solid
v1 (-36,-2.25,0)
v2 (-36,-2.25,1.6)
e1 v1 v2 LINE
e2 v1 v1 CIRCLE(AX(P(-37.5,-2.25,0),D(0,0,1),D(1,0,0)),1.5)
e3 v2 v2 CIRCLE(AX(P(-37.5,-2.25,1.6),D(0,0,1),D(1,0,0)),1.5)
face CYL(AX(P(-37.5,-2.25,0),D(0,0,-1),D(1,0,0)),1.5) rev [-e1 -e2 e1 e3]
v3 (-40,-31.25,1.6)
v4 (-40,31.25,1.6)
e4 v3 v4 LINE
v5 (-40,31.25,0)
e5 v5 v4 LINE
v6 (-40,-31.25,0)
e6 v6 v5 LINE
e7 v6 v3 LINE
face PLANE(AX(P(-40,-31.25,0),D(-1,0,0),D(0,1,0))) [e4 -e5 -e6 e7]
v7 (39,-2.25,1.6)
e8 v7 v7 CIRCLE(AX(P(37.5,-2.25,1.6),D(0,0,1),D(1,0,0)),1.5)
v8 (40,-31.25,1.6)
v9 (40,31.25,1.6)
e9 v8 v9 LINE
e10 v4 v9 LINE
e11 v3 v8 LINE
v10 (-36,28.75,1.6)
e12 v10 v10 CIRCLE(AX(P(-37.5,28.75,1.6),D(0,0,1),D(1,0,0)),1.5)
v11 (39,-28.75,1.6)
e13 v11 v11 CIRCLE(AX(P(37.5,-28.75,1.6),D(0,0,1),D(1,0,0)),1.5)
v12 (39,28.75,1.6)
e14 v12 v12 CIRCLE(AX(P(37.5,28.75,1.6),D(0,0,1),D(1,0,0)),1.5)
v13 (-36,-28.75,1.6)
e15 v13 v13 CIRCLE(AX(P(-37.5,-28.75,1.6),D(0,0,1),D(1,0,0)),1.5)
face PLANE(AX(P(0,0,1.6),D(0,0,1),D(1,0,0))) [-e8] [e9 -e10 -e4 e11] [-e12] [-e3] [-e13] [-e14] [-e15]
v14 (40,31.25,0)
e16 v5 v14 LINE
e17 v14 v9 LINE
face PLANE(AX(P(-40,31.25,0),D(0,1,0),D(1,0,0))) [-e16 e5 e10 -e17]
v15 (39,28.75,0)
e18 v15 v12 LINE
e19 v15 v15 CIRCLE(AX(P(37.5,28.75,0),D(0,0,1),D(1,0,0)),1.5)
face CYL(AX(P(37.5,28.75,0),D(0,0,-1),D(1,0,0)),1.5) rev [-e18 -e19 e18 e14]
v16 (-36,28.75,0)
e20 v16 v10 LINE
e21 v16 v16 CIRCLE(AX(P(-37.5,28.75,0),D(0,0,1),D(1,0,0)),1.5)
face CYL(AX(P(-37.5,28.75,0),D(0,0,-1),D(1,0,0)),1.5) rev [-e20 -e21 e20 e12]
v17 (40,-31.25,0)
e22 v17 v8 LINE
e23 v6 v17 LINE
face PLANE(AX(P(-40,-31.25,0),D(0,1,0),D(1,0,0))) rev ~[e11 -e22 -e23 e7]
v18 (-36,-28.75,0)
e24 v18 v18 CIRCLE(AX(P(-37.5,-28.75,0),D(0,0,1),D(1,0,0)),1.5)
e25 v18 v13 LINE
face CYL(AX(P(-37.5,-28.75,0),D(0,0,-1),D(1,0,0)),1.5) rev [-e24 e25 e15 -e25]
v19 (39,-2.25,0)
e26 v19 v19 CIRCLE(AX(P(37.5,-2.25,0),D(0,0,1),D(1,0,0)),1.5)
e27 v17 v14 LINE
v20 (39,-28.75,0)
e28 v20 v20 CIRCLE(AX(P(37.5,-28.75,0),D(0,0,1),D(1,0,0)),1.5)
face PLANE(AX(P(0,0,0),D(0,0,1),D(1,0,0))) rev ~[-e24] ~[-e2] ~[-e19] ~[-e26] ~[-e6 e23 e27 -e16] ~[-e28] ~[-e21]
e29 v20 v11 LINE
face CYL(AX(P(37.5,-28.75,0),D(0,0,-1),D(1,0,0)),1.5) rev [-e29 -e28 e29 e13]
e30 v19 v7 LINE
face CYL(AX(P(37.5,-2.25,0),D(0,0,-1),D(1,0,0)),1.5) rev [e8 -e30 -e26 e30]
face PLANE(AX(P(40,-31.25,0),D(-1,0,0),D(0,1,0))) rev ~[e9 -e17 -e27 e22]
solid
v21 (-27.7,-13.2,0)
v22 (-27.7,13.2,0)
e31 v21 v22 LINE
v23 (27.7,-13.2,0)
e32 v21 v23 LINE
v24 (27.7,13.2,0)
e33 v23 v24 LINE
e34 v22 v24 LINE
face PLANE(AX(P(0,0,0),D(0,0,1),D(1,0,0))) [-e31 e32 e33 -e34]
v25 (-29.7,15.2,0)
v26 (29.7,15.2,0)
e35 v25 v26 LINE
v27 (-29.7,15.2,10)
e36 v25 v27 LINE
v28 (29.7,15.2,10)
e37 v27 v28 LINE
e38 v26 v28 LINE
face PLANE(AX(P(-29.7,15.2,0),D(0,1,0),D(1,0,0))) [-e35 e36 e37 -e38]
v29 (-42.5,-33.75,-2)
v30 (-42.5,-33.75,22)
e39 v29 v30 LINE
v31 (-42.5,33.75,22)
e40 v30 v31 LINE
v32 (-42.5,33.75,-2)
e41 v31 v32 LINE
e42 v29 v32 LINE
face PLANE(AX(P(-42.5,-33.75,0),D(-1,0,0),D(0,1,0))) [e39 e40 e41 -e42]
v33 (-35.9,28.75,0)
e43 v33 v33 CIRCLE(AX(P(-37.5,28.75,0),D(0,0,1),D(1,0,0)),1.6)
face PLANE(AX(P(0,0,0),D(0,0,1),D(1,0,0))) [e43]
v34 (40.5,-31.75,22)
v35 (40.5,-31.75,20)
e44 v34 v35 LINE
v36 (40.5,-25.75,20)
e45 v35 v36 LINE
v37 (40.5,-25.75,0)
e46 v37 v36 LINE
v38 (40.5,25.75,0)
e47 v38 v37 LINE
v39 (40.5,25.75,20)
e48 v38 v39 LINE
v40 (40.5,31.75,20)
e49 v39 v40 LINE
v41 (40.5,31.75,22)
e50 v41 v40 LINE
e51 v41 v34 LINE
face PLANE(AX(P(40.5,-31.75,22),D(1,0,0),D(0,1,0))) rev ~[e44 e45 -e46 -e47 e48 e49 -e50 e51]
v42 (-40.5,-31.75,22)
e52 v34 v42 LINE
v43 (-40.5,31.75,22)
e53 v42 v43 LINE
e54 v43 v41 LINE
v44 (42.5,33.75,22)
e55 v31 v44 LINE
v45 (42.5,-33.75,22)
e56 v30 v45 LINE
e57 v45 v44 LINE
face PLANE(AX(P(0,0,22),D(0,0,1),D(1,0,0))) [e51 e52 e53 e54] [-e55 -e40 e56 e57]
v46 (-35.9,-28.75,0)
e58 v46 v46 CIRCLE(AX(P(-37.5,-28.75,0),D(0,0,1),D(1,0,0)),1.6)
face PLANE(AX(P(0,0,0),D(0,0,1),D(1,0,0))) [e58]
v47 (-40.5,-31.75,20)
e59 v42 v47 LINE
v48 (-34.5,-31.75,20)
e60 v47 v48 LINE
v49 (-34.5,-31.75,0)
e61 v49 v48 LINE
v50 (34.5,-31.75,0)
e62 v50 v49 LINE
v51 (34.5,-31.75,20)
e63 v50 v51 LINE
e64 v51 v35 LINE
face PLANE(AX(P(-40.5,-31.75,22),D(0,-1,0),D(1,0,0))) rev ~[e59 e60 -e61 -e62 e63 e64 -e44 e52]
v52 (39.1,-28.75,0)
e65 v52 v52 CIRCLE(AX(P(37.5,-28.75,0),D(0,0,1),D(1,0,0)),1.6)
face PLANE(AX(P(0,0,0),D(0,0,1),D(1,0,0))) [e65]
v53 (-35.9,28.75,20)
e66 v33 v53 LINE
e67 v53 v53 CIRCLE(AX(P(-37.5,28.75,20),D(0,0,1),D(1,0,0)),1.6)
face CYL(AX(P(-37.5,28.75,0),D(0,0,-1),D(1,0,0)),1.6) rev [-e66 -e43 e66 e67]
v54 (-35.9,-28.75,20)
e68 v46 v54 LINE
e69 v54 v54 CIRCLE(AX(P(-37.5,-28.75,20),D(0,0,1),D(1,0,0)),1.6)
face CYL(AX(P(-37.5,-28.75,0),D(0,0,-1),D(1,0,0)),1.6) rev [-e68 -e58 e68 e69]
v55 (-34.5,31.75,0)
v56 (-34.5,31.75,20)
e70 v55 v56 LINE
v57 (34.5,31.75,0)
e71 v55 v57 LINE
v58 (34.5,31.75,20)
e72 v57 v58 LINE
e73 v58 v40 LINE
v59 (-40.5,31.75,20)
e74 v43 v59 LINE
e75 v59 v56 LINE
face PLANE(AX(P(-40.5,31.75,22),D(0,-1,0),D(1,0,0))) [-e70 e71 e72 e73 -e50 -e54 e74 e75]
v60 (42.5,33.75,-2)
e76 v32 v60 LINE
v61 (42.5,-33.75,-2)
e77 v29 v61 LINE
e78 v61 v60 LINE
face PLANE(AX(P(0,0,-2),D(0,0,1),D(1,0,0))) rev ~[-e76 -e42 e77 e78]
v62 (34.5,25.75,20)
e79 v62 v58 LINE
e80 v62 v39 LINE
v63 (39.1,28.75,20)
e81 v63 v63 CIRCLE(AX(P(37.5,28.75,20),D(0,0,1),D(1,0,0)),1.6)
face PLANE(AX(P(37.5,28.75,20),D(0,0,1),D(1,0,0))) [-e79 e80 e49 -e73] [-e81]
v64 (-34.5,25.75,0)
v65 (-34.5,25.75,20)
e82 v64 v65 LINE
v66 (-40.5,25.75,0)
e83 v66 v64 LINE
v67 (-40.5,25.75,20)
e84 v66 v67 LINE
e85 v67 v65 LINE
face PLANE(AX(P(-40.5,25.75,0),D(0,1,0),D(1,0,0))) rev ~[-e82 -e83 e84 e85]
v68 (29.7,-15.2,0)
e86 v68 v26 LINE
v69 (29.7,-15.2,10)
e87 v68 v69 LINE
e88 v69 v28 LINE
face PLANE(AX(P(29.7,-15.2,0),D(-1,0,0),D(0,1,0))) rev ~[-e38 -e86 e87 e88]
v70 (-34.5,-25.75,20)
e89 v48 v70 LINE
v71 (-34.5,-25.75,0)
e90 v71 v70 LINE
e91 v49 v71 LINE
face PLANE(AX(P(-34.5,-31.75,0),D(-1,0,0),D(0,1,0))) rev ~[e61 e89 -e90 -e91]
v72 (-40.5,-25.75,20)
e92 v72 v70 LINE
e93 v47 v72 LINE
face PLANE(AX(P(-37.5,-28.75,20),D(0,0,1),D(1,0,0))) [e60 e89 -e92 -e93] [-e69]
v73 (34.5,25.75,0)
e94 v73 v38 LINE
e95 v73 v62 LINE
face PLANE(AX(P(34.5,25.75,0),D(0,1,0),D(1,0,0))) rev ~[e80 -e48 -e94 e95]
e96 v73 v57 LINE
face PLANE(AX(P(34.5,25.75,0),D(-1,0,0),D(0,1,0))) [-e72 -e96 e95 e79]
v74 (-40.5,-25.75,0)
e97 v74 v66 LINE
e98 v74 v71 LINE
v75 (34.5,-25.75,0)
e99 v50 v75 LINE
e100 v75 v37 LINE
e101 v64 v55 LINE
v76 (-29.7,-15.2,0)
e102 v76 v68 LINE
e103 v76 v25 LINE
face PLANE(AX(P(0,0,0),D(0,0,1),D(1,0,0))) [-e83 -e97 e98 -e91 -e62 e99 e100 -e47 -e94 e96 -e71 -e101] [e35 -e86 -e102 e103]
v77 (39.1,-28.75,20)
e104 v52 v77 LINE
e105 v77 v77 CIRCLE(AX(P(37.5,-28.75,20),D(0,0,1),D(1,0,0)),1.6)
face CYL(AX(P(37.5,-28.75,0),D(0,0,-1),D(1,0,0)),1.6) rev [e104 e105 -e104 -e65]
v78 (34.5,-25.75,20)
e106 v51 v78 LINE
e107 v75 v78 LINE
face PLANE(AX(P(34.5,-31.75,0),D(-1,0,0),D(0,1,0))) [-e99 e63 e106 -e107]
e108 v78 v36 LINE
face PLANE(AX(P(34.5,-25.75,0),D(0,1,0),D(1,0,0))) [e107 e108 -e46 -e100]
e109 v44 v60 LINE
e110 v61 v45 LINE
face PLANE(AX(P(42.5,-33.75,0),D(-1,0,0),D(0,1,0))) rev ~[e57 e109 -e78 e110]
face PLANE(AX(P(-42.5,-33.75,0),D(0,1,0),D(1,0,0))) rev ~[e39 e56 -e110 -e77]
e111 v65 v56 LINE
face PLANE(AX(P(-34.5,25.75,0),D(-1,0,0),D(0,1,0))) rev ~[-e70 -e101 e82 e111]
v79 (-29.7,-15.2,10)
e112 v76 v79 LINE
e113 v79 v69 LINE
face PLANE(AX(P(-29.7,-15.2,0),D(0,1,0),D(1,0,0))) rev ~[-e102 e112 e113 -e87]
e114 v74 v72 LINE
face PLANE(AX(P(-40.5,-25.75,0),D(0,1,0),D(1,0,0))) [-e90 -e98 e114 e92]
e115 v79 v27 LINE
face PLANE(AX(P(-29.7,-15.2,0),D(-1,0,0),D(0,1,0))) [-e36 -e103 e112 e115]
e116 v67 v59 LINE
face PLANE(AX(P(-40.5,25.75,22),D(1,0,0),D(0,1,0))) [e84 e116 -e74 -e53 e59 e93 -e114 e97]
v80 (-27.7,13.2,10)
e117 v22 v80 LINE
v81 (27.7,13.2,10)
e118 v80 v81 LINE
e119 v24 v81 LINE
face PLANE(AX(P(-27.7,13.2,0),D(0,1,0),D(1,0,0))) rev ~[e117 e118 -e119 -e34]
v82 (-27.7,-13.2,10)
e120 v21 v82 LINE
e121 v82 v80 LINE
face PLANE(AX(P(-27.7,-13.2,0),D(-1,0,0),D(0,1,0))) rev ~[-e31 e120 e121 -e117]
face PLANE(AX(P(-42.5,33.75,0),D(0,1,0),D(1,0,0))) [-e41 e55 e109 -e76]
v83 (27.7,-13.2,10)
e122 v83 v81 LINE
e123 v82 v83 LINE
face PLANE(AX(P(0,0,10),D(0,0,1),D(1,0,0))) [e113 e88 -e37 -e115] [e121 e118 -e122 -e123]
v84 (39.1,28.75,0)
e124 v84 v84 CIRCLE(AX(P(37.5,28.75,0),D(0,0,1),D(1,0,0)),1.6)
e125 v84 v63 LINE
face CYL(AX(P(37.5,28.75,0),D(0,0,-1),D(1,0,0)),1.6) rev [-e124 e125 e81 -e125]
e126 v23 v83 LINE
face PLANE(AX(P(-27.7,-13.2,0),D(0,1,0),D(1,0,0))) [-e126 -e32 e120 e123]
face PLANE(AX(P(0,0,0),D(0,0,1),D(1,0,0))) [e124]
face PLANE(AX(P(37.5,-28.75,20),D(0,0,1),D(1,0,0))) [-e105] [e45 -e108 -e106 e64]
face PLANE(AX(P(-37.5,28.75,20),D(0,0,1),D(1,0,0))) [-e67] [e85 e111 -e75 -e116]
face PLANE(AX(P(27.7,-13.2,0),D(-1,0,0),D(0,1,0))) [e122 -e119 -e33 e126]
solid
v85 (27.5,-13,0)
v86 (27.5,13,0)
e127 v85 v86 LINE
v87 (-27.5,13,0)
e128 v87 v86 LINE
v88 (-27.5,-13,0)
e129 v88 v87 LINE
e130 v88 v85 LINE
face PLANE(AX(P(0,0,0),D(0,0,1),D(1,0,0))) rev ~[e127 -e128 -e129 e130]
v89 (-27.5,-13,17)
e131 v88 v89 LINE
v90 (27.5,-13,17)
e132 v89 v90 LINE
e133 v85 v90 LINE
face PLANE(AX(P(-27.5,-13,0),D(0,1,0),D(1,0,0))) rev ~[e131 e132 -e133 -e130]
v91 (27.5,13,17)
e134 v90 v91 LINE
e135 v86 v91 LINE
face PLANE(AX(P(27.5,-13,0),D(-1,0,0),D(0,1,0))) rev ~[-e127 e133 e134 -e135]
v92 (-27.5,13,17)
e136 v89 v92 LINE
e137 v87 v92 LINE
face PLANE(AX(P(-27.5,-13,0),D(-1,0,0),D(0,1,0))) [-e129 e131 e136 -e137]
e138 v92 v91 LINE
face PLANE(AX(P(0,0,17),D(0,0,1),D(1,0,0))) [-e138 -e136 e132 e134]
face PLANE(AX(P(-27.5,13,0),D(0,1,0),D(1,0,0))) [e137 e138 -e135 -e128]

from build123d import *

# Parameters (mm, degrees)
F1_W      = 80
F1_H      = 62.5
F1_R      = 1.5
F2_DEPTH  = 1.6
F3_W      = 85
F3_H      = 67.5
F3_W_2    = 6
F3_H_2    = 6
F3_R      = 1.6
F4_DEPTH  = 2
F5_DEPTH  = 22
F6_W      = 6
F6_H      = 6
F6_R      = 1.6
F7_DEPTH  = 2
F8_W      = 55
F8_H      = 26
F9_DEPTH  = 17
F10_W     = 59.4
F10_H     = 30.4
F10_W_2   = 55.4
F10_H_2   = 26.4
F11_DEPTH = 10


with BuildPart() as f2:
    # F1 (on Top) → F2 (new body)
    with BuildSketch(Plane.XY):
        Rectangle(F1_W, F1_H)
        with Locations((-37.5, -28.75)):
            Circle(F1_R, mode=Mode.SUBTRACT)
        with Locations((-37.5, -2.25)):
            Circle(F1_R, mode=Mode.SUBTRACT)
        with Locations((37.5, -28.75)):
            Circle(F1_R, mode=Mode.SUBTRACT)
        with Locations((37.5, -2.25)):
            Circle(F1_R, mode=Mode.SUBTRACT)
        with Locations((-37.5, 28.75)):
            Circle(F1_R, mode=Mode.SUBTRACT)
        with Locations((37.5, 28.75)):
            Circle(F1_R, mode=Mode.SUBTRACT)
    extrude(amount=F2_DEPTH)


with BuildPart() as f4:
    # F3 (on Top) → F4 (new body)
    with BuildSketch(Plane.XY):
        Rectangle(F3_W, F3_H)
        Polygon((34.5, 31.75), (40.5, 31.75), (40.5, 25.75), (40.5, -25.75), (40.5, -31.75), (34.5, -31.75), (-34.5, -31.75), (-40.5, -31.75), (-40.5, -25.75), (-40.5, 25.75), (-40.5, 31.75), (-34.5, 31.75), align=None, mode=Mode.SUBTRACT)
        with Locations((-37.5, 28.75)):
            Rectangle(F3_W_2, F3_H_2)
        with Locations((-37.5, 28.75)):
            Circle(F3_R, mode=Mode.SUBTRACT)
        with Locations((-37.5, 28.75)):
            Circle(F3_R)
        Polygon((34.5, 25.75), (34.5, 31.75), (-34.5, 31.75), (-34.5, 25.75), (-40.5, 25.75), (-40.5, -25.75), (-34.5, -25.75), (-34.5, -31.75), (34.5, -31.75), (34.5, -25.75), (40.5, -25.75), (40.5, 25.75), align=None)
        with Locations((37.5, 28.75)):
            Rectangle(F3_W_2, F3_H_2)
        with Locations((37.5, 28.75)):
            Circle(F3_R, mode=Mode.SUBTRACT)
        with Locations((37.5, 28.75)):
            Circle(F3_R)
        with Locations((37.5, -28.75)):
            Rectangle(F3_W_2, F3_H_2)
        with Locations((37.5, -28.75)):
            Circle(F3_R, mode=Mode.SUBTRACT)
        with Locations((37.5, -28.75)):
            Circle(F3_R)
        with Locations((-37.5, -28.75)):
            Rectangle(F3_W_2, F3_H_2)
        with Locations((-37.5, -28.75)):
            Circle(F3_R, mode=Mode.SUBTRACT)
        with Locations((-37.5, -28.75)):
            Circle(F3_R)
    extrude(amount=-F4_DEPTH)

    # F3 (on Top) → F5 (join)
    with BuildSketch(Plane.XY):
        Rectangle(F3_W, F3_H)
        Polygon((34.5, 31.75), (40.5, 31.75), (40.5, 25.75), (40.5, -25.75), (40.5, -31.75), (34.5, -31.75), (-34.5, -31.75), (-40.5, -31.75), (-40.5, -25.75), (-40.5, 25.75), (-40.5, 31.75), (-34.5, 31.75), align=None, mode=Mode.SUBTRACT)
        with Locations((-37.5, 28.75)):
            Rectangle(F3_W_2, F3_H_2)
        with Locations((-37.5, 28.75)):
            Circle(F3_R, mode=Mode.SUBTRACT)
        with Locations((37.5, 28.75)):
            Rectangle(F3_W_2, F3_H_2)
        with Locations((37.5, 28.75)):
            Circle(F3_R, mode=Mode.SUBTRACT)
        with Locations((37.5, -28.75)):
            Rectangle(F3_W_2, F3_H_2)
        with Locations((37.5, -28.75)):
            Circle(F3_R, mode=Mode.SUBTRACT)
        with Locations((-37.5, -28.75)):
            Rectangle(F3_W_2, F3_H_2)
        with Locations((-37.5, -28.75)):
            Circle(F3_R, mode=Mode.SUBTRACT)
    extrude(amount=F5_DEPTH)

    # F6 (on face) → F7 (cut)
    with BuildSketch(Plane.XY.offset(22)):
        with Locations((-37.5, 28.75)):
            Rectangle(F6_W, F6_H)
        with Locations((-37.5, 28.75)):
            Circle(F6_R, mode=Mode.SUBTRACT)
        with Locations((-37.5, -28.75)):
            Rectangle(F6_W, F6_H)
        with Locations((-37.5, -28.75)):
            Circle(F6_R, mode=Mode.SUBTRACT)
        with Locations((37.5, 28.75)):
            Rectangle(F6_W, F6_H)
        with Locations((37.5, 28.75)):
            Circle(F6_R, mode=Mode.SUBTRACT)
        with Locations((37.5, -28.75)):
            Rectangle(F6_W, F6_H)
        with Locations((37.5, -28.75)):
            Circle(F6_R, mode=Mode.SUBTRACT)
    extrude(amount=-F7_DEPTH, mode=Mode.SUBTRACT)

    # F10 (on face) → F11 (join)
    with BuildSketch(Plane.XY):
        Rectangle(F10_W, F10_H)
        Rectangle(F10_W_2, F10_H_2, mode=Mode.SUBTRACT)
    extrude(amount=F11_DEPTH)


with BuildPart() as f9:
    # F8 (on Top) → F9 (new body)
    with BuildSketch(Plane.XY):
        Rectangle(F8_W, F8_H)
    extrude(amount=F9_DEPTH)


solid = Compound([f2.part, f4.part, f9.part])
